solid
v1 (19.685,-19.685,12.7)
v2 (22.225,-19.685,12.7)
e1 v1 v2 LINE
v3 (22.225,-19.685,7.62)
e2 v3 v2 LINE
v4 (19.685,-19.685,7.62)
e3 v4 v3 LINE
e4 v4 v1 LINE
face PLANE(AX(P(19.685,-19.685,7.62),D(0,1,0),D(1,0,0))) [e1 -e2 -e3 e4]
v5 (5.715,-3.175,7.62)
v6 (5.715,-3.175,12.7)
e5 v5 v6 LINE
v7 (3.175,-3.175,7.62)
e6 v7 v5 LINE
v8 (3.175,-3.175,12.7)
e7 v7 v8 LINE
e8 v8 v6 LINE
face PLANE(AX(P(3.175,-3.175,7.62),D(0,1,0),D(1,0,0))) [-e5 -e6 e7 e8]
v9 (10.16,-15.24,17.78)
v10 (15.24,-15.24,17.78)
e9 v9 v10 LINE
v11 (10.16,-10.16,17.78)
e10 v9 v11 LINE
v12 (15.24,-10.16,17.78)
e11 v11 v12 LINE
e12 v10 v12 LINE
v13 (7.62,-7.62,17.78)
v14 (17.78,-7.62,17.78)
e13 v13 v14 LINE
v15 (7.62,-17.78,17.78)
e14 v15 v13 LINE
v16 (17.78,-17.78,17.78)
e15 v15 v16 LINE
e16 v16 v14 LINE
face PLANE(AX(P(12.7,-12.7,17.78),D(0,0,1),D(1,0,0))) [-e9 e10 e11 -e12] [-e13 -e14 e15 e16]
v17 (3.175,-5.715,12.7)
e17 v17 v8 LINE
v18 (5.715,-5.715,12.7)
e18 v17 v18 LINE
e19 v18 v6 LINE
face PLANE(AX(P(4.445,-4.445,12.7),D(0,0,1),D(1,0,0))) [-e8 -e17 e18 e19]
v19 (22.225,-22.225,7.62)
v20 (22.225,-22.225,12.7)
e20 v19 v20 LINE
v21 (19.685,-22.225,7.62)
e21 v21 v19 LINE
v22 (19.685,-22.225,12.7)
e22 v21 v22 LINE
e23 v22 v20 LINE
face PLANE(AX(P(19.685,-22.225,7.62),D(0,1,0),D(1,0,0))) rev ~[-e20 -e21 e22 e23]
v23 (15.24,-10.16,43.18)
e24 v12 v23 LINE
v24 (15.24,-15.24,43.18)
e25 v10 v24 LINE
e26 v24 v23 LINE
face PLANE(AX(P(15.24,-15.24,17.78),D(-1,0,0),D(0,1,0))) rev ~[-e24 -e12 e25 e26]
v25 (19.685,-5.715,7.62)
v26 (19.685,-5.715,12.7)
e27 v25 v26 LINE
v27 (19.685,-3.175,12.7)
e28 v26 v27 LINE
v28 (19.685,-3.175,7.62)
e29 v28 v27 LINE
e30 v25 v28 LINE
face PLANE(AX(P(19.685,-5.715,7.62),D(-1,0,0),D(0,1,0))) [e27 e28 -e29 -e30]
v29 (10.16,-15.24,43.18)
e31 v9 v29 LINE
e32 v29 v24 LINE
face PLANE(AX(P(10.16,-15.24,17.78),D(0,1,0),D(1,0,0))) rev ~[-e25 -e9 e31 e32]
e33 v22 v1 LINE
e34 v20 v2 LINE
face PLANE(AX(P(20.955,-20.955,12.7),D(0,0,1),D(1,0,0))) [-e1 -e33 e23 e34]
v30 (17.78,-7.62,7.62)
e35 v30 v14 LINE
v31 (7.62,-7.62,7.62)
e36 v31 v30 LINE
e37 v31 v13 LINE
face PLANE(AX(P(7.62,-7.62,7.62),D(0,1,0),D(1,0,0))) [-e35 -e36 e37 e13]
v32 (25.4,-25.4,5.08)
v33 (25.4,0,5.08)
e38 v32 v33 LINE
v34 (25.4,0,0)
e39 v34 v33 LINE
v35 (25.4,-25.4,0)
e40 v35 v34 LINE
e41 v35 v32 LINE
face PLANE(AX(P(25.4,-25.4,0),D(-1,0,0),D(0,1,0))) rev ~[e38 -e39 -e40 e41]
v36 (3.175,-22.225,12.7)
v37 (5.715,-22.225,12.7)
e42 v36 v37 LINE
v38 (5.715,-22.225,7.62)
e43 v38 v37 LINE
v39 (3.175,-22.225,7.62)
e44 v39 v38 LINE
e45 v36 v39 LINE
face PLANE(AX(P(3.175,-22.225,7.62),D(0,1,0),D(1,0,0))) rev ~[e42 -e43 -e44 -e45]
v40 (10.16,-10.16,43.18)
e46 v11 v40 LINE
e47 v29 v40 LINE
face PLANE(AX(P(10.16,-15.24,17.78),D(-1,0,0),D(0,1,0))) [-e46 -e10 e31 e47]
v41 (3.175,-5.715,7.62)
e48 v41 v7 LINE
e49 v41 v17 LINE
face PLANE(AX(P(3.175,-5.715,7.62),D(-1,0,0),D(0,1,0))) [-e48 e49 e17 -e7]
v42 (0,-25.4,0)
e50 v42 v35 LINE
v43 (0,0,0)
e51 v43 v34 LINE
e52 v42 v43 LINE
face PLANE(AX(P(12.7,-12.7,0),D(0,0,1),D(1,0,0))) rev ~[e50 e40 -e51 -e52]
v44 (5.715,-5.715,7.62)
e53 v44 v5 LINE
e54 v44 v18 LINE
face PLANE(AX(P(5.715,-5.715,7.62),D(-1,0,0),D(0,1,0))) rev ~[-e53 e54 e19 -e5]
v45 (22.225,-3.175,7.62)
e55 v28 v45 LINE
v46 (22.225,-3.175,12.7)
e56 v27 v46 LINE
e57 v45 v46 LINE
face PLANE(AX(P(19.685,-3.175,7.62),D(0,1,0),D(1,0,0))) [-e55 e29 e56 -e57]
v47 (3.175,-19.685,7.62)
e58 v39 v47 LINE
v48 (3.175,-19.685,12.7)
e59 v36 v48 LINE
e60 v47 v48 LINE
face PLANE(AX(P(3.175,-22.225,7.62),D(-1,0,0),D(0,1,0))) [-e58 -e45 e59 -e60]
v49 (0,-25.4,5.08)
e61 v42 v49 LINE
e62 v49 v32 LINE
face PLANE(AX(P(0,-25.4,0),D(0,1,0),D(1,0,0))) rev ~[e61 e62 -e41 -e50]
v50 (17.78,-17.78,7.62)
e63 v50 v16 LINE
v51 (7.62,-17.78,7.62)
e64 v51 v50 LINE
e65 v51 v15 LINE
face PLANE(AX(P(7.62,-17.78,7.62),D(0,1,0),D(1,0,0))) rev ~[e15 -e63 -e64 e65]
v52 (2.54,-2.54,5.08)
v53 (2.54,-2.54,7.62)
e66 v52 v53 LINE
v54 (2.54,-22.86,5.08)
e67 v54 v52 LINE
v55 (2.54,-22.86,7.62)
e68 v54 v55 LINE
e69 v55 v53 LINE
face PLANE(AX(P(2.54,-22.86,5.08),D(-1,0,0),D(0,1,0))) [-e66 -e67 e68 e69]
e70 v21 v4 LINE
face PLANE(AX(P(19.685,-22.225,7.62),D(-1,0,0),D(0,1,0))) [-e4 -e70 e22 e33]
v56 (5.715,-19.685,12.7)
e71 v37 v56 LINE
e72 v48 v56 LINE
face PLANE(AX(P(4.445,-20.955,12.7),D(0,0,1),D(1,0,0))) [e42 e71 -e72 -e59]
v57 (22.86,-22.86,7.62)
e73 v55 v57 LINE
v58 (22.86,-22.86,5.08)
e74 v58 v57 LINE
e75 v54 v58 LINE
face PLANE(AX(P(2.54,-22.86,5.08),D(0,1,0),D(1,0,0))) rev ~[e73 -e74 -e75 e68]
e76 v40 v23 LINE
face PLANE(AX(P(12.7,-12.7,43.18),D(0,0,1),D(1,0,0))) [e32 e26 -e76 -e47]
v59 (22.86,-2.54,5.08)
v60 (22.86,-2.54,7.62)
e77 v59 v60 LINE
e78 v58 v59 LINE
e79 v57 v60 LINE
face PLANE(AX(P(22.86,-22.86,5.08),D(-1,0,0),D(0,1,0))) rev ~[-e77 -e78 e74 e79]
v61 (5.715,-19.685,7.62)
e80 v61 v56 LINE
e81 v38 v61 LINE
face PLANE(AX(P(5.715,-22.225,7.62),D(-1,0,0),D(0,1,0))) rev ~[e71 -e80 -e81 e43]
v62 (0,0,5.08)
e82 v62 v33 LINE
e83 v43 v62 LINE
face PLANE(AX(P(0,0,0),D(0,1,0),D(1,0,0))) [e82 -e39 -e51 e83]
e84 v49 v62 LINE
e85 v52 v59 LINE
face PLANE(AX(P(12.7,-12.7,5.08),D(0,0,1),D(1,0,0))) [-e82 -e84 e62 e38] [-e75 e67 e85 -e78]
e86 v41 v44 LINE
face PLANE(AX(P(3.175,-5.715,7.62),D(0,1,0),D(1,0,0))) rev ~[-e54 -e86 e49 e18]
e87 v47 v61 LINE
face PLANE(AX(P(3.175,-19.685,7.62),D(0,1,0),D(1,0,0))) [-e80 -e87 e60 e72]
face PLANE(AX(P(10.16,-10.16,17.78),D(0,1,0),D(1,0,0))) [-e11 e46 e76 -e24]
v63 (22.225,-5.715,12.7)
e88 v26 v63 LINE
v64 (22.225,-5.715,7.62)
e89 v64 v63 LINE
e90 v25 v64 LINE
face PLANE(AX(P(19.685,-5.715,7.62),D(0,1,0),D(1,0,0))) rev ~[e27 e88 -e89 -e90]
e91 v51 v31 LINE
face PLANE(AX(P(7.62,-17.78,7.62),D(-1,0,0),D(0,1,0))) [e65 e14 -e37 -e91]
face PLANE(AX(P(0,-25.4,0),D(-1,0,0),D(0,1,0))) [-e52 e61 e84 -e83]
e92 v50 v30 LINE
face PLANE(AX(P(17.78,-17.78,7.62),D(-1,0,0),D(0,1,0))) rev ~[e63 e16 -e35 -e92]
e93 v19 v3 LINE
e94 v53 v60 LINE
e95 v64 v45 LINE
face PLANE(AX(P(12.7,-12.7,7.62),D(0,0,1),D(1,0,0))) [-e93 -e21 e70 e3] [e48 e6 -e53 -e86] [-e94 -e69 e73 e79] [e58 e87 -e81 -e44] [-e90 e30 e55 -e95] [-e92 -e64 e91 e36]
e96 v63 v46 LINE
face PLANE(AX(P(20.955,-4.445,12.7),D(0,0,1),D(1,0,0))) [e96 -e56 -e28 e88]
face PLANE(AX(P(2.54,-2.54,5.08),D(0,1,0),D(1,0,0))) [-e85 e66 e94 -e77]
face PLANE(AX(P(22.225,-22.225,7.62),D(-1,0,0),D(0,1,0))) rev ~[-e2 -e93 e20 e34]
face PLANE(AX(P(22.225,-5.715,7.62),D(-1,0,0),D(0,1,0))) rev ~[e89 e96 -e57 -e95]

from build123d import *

# Parameters (mm, degrees)
F0_W      = 25.4
F0_H      = 25.4
F1_DEPTH  = 5.08
F2_W      = 20.32
F2_H      = 20.32
F3_DEPTH  = 2.54
F4_W      = 10.16
F4_H      = 10.16
F5_DEPTH  = 10.16
F6_W      = 5.08
F6_H      = 5.08
F7_DEPTH  = 25.4
F8_W      = 2.54
F8_H      = 2.54
F9_DEPTH  = 5.08
F10_R     = 0.635
F11_DEPTH = 0.254
F13_R     = 2.2046300475
F14_DEPTH = 25.4


# Not quite as in the source:
# - a fillet or chamfer that OpenCascade refuses, or shapes differently, is made with other operations: its cross-section is extruded or revolved along the edge and cut away or added


with BuildPart() as f1:
    # F0 (on Top) → F1 (new body)
    with BuildSketch(Plane.XY):
        with Locations((12.7, -12.7)):
            Rectangle(F0_W, F0_H)
    extrude(amount=F1_DEPTH)

    # F2 (on face) → F3 (join)
    with BuildSketch(Plane.XY.offset(5.08)):
        with Locations((12.7, -12.7)):
            Rectangle(F2_W, F2_H)
    extrude(amount=F3_DEPTH)

    # F4 (on face) → F5 (join)
    with BuildSketch(Plane.XY.offset(7.62)):
        with Locations((12.7, -12.7)):
            Rectangle(F4_W, F4_H)
    extrude(amount=F5_DEPTH)

    # F6 (on face) → F7 (join)
    with BuildSketch(Plane.XY.offset(17.78)):
        with Locations((12.7, -12.7)):
            Rectangle(F6_W, F6_H)
    extrude(amount=F7_DEPTH)

    # F8 (on face) → F9 (join)
    with BuildSketch(Plane.XY.offset(7.62)):
        with Locations((4.445, -4.445)):
            Rectangle(F8_W, F8_H)
        with Locations((20.955, -4.445)):
            Rectangle(F8_W, F8_H)
        with Locations((20.955, -20.955)):
            Rectangle(F8_W, F8_H)
        with Locations((4.445, -20.955)):
            Rectangle(F8_W, F8_H)
    extrude(amount=F9_DEPTH)

    # F10 (on face) → F11 (join)
    with BuildSketch(Plane.XZ.offset(22.225)):
        with Locations((4.445, 11.43)):
            Circle(F10_R)
    extrude(amount=F11_DEPTH)

    # F12: fillet of radius 0.8636 on 1 edges, made by hand


with BuildPart() as f12_tool2:
    # F12_s3 → F12_t4 (revolve)
    with BuildSketch(Plane.XY.offset(11.43)):
        with BuildLine():
            ThreePointArc((5.08, -21.6154), (4.9031400964, -22.1390344145), (4.445, -22.4481946926))
            Line((4.445, -22.4481946926), (4.445, -22.479))
            Line((4.445, -22.479), (5.08, -22.479))
            Line((5.08, -22.479), (5.08, -21.6154))
        make_face()
    revolve(axis=Axis((4.445, -22.479, 11.43), (0, -1, 0)))

    split(bisect_by=Plane.XZ.offset(22.225), keep=Keep.TOP)


with BuildPart() as f1_1:
    add(f1.part)

    # F12_t1: cut F12_tool2
    add(f12_tool2.part, mode=Mode.SUBTRACT)

    # F13 (on face) → F14 (cut)
    with BuildSketch(Plane.XZ.offset(22.225)):
        with Locations((4.445, 11.43)):
            Circle(F13_R)
    extrude(amount=F14_DEPTH, mode=Mode.SUBTRACT)


solid = f1_1.part
